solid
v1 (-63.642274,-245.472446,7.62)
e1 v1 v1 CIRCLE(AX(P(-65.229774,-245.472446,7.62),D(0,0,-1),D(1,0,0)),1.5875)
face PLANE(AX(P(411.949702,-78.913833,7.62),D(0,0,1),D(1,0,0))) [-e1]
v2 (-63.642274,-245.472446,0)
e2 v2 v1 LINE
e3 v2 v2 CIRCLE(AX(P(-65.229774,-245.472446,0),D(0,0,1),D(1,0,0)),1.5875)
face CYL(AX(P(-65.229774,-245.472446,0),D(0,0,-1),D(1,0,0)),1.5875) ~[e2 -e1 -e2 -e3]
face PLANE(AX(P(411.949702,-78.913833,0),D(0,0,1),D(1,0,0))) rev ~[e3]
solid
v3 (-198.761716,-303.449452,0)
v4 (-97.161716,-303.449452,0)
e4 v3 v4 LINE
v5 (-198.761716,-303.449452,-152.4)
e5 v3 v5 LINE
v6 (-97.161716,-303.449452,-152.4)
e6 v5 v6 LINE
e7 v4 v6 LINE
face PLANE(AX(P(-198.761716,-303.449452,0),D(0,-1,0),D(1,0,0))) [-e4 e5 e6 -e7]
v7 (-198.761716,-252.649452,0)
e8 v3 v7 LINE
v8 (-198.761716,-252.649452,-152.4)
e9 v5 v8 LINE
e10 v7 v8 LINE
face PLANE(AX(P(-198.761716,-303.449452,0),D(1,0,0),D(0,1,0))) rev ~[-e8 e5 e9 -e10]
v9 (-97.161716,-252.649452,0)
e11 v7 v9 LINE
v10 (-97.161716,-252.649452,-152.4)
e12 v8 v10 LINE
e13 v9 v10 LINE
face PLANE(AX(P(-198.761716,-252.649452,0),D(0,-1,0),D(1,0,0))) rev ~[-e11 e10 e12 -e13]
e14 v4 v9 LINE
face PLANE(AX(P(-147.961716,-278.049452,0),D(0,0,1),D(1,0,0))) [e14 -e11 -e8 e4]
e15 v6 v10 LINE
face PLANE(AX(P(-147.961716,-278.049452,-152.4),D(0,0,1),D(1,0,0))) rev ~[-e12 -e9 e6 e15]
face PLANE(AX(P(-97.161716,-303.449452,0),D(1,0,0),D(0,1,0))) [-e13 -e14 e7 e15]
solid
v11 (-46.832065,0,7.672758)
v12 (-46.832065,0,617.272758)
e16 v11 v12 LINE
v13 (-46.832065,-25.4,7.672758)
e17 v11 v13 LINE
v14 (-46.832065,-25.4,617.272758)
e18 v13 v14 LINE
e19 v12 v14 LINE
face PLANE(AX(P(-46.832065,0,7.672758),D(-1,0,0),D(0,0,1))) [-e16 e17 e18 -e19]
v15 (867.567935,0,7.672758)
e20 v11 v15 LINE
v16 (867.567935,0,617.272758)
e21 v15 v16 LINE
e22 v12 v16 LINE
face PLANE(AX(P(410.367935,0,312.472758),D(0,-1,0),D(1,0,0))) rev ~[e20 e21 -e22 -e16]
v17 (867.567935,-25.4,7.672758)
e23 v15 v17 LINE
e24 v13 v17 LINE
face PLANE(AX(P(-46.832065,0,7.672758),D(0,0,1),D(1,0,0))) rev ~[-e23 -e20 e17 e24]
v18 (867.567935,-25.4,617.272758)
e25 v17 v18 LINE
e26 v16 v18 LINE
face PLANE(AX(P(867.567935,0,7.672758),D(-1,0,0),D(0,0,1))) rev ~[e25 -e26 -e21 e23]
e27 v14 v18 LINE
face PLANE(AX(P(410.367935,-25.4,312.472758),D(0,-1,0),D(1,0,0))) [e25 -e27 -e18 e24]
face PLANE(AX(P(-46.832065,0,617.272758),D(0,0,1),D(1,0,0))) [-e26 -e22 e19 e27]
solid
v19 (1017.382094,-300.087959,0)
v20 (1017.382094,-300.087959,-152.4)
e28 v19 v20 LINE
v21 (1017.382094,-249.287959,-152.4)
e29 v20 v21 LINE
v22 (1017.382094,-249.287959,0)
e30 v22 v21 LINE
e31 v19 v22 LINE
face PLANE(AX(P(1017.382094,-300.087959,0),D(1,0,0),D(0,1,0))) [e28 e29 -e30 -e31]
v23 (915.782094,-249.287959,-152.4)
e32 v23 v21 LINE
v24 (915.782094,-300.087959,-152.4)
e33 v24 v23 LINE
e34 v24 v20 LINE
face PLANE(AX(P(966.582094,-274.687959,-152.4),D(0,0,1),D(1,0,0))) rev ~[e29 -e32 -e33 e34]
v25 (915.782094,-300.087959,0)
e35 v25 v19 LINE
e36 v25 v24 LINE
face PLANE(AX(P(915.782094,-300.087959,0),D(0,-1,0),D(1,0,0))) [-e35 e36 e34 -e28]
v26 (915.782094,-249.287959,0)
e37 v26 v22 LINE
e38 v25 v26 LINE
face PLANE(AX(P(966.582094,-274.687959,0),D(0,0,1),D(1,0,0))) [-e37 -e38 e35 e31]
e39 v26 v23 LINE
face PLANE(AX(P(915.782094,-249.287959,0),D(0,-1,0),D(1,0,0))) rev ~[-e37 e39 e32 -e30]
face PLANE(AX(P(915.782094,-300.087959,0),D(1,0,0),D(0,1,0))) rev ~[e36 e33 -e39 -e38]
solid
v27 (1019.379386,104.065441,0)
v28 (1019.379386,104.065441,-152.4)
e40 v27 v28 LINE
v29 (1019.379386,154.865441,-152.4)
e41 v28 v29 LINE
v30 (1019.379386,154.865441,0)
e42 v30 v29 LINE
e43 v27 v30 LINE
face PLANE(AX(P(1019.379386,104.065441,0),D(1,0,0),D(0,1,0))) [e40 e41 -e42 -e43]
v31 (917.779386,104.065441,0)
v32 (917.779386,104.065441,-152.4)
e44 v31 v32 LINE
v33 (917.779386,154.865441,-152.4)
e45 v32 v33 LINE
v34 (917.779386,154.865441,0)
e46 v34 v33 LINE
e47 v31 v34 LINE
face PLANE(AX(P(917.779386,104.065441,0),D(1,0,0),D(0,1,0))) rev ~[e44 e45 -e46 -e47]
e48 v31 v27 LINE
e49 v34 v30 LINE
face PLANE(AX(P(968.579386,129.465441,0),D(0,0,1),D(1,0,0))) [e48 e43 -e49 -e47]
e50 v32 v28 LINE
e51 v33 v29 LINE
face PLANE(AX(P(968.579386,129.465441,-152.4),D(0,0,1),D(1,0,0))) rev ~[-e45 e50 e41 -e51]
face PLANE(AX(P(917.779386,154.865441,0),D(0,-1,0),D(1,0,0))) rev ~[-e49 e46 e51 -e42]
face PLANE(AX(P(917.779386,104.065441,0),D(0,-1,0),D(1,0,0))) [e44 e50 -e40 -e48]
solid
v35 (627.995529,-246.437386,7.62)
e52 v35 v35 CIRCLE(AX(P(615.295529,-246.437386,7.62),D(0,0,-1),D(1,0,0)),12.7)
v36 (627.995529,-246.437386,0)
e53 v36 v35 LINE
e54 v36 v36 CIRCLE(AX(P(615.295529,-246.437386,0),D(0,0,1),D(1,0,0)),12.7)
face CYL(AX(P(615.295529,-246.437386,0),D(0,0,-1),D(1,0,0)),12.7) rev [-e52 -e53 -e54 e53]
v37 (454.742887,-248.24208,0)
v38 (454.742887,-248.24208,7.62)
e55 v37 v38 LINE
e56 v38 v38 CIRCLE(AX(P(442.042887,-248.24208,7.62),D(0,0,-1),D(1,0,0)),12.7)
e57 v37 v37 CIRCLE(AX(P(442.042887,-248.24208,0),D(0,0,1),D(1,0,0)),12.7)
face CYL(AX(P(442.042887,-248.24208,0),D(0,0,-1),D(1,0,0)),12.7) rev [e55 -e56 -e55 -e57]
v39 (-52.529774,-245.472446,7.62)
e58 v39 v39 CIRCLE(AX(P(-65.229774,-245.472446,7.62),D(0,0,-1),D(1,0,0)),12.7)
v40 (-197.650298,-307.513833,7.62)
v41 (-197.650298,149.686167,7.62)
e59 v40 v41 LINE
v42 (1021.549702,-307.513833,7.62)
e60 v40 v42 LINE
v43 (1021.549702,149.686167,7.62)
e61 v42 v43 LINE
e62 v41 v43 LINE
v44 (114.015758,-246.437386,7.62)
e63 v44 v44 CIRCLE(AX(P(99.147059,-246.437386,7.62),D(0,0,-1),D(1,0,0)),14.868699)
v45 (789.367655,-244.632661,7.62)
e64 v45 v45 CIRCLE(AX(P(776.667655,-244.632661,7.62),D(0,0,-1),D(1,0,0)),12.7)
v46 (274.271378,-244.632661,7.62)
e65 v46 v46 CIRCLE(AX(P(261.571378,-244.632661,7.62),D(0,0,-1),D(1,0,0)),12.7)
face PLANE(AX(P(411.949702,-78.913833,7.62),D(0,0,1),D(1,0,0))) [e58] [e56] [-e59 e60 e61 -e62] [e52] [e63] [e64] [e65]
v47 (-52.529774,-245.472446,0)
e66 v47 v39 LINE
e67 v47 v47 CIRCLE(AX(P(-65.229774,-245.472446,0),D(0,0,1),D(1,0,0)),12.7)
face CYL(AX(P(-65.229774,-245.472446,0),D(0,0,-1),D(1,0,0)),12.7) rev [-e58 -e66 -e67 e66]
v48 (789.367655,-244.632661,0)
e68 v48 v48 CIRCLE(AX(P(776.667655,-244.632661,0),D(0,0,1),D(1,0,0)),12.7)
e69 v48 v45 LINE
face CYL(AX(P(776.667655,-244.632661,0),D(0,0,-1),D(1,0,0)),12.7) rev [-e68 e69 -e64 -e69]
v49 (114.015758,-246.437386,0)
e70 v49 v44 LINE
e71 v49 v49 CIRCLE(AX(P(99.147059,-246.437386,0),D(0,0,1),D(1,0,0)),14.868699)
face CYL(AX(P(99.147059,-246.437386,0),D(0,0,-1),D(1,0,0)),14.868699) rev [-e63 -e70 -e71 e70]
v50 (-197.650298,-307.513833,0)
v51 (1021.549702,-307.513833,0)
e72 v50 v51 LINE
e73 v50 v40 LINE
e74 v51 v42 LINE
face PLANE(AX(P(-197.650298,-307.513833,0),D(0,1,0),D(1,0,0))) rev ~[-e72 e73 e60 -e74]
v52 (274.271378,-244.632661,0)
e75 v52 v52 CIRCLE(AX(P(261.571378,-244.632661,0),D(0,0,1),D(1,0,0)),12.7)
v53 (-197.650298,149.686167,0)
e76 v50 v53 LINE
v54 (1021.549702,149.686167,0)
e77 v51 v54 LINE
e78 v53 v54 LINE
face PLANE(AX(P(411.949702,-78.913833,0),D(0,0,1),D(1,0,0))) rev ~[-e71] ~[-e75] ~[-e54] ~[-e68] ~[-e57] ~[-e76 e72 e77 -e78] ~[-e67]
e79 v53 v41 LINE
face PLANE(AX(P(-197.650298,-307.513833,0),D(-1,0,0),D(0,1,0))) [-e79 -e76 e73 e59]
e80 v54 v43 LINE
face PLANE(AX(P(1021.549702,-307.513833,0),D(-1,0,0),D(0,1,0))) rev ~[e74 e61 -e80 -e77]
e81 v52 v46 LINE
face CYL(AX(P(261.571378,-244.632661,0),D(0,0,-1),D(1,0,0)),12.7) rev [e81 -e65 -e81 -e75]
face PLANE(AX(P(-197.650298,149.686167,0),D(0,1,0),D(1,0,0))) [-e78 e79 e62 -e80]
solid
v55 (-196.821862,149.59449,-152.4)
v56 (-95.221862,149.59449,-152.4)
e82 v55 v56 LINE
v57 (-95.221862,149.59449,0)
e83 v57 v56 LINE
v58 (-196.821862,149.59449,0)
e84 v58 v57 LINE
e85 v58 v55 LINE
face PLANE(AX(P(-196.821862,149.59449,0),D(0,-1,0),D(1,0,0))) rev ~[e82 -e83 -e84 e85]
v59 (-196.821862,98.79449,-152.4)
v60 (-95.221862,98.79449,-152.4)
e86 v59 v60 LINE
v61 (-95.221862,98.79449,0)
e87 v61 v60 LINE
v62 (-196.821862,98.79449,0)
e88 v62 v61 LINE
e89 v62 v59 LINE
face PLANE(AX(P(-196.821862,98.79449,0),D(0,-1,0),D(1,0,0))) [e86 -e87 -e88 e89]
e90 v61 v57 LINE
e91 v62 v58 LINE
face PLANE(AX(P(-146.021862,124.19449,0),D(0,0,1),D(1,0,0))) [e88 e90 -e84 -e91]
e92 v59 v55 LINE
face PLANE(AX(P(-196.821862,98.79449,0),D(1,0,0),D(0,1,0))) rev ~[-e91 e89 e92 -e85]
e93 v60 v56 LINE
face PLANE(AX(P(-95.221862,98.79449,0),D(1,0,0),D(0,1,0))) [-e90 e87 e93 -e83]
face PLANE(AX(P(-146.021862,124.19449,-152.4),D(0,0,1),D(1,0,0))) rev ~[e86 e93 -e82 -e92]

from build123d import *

# Parameters (mm, degrees)
F0_W     = 914.4
F0_H     = 609.6
F1_DEPTH = 25.4
F4_W     = 101.6
F4_H     = 50.8
F5_DEPTH = 152.4
F6_W     = 1219.2
F6_H     = 457.2
F7_DEPTH = 7.62
F8_R     = 12.7
F8_R_2   = 1.5875
F8_R_3   = 14.868698601
F9_DEPTH = 617.2737575347


# Not quite as in the source:
# - the program builds the solid bodies; features that only make, move or delete a surface that nothing else refers to are left out


with BuildPart() as f1:
    # F0 (on Front) → F1 (new body)
    with BuildSketch(Plane.XZ):
        with Locations((410.367934819, 312.4727575347)):
            Rectangle(F0_W, F0_H)
    extrude(amount=F1_DEPTH)


with BuildPart() as f5:
    # F4 (on Top) → F5 (new body)
    with BuildSketch(Plane.XY):
        with Locations((-147.961716485, -278.0494519234)):
            Rectangle(F4_W, F4_H)
    extrude(amount=-F5_DEPTH)


with BuildPart() as f5b:
    # F4 (on Top) → F5, piece 2 (new body)
    with BuildSketch(Plane.XY):
        with Locations((968.5793860435, 129.4654405951)):
            Rectangle(F4_W, F4_H)
    extrude(amount=-F5_DEPTH)


with BuildPart() as f5c:
    # F4 (on Top) → F5, piece 3 (new body)
    with BuildSketch(Plane.XY):
        with Locations((966.5820940018, -274.6879585743)):
            Rectangle(F4_W, F4_H)
    extrude(amount=-F5_DEPTH)


with BuildPart() as f5d:
    # F4 (on Top) → F5, piece 4 (new body)
    with BuildSketch(Plane.XY):
        with Locations((-146.0218621969, 124.194490099)):
            Rectangle(F4_W, F4_H)
    extrude(amount=-F5_DEPTH)


with BuildPart() as f7:
    # F6 (on Top) → F7 (new body)
    with BuildSketch(Plane.XY):
        with Locations((411.9497016907, -78.913833046)):
            Rectangle(F6_W, F6_H)
    extrude(amount=F7_DEPTH)

    # F8 (on Top) → F9 (cut, through all)
    with BuildSketch(Plane.XY):
        with Locations((-65.2297735214, -245.472446084)):
            Circle(F8_R)
        with Locations((-65.2297735214, -245.472446084)):
            Circle(F8_R_2, mode=Mode.SUBTRACT)
        with Locations((99.1470590234, -246.4373856783)):
            Circle(F8_R_3)
        with Locations((261.5713775158, -244.6326613426)):
            Circle(F8_R)
        with Locations((442.0428872108, -248.2420802116)):
            Circle(F8_R)
        with Locations((615.2955293655, -246.4373856783)):
            Circle(F8_R)
        with Locations((776.6676545143, -244.6326613426)):
            Circle(F8_R)
    extrude(amount=F9_DEPTH, mode=Mode.SUBTRACT)


solid = Compound([f1.part, f5.part, f5b.part, f5c.part, f5d.part, f7.part])
